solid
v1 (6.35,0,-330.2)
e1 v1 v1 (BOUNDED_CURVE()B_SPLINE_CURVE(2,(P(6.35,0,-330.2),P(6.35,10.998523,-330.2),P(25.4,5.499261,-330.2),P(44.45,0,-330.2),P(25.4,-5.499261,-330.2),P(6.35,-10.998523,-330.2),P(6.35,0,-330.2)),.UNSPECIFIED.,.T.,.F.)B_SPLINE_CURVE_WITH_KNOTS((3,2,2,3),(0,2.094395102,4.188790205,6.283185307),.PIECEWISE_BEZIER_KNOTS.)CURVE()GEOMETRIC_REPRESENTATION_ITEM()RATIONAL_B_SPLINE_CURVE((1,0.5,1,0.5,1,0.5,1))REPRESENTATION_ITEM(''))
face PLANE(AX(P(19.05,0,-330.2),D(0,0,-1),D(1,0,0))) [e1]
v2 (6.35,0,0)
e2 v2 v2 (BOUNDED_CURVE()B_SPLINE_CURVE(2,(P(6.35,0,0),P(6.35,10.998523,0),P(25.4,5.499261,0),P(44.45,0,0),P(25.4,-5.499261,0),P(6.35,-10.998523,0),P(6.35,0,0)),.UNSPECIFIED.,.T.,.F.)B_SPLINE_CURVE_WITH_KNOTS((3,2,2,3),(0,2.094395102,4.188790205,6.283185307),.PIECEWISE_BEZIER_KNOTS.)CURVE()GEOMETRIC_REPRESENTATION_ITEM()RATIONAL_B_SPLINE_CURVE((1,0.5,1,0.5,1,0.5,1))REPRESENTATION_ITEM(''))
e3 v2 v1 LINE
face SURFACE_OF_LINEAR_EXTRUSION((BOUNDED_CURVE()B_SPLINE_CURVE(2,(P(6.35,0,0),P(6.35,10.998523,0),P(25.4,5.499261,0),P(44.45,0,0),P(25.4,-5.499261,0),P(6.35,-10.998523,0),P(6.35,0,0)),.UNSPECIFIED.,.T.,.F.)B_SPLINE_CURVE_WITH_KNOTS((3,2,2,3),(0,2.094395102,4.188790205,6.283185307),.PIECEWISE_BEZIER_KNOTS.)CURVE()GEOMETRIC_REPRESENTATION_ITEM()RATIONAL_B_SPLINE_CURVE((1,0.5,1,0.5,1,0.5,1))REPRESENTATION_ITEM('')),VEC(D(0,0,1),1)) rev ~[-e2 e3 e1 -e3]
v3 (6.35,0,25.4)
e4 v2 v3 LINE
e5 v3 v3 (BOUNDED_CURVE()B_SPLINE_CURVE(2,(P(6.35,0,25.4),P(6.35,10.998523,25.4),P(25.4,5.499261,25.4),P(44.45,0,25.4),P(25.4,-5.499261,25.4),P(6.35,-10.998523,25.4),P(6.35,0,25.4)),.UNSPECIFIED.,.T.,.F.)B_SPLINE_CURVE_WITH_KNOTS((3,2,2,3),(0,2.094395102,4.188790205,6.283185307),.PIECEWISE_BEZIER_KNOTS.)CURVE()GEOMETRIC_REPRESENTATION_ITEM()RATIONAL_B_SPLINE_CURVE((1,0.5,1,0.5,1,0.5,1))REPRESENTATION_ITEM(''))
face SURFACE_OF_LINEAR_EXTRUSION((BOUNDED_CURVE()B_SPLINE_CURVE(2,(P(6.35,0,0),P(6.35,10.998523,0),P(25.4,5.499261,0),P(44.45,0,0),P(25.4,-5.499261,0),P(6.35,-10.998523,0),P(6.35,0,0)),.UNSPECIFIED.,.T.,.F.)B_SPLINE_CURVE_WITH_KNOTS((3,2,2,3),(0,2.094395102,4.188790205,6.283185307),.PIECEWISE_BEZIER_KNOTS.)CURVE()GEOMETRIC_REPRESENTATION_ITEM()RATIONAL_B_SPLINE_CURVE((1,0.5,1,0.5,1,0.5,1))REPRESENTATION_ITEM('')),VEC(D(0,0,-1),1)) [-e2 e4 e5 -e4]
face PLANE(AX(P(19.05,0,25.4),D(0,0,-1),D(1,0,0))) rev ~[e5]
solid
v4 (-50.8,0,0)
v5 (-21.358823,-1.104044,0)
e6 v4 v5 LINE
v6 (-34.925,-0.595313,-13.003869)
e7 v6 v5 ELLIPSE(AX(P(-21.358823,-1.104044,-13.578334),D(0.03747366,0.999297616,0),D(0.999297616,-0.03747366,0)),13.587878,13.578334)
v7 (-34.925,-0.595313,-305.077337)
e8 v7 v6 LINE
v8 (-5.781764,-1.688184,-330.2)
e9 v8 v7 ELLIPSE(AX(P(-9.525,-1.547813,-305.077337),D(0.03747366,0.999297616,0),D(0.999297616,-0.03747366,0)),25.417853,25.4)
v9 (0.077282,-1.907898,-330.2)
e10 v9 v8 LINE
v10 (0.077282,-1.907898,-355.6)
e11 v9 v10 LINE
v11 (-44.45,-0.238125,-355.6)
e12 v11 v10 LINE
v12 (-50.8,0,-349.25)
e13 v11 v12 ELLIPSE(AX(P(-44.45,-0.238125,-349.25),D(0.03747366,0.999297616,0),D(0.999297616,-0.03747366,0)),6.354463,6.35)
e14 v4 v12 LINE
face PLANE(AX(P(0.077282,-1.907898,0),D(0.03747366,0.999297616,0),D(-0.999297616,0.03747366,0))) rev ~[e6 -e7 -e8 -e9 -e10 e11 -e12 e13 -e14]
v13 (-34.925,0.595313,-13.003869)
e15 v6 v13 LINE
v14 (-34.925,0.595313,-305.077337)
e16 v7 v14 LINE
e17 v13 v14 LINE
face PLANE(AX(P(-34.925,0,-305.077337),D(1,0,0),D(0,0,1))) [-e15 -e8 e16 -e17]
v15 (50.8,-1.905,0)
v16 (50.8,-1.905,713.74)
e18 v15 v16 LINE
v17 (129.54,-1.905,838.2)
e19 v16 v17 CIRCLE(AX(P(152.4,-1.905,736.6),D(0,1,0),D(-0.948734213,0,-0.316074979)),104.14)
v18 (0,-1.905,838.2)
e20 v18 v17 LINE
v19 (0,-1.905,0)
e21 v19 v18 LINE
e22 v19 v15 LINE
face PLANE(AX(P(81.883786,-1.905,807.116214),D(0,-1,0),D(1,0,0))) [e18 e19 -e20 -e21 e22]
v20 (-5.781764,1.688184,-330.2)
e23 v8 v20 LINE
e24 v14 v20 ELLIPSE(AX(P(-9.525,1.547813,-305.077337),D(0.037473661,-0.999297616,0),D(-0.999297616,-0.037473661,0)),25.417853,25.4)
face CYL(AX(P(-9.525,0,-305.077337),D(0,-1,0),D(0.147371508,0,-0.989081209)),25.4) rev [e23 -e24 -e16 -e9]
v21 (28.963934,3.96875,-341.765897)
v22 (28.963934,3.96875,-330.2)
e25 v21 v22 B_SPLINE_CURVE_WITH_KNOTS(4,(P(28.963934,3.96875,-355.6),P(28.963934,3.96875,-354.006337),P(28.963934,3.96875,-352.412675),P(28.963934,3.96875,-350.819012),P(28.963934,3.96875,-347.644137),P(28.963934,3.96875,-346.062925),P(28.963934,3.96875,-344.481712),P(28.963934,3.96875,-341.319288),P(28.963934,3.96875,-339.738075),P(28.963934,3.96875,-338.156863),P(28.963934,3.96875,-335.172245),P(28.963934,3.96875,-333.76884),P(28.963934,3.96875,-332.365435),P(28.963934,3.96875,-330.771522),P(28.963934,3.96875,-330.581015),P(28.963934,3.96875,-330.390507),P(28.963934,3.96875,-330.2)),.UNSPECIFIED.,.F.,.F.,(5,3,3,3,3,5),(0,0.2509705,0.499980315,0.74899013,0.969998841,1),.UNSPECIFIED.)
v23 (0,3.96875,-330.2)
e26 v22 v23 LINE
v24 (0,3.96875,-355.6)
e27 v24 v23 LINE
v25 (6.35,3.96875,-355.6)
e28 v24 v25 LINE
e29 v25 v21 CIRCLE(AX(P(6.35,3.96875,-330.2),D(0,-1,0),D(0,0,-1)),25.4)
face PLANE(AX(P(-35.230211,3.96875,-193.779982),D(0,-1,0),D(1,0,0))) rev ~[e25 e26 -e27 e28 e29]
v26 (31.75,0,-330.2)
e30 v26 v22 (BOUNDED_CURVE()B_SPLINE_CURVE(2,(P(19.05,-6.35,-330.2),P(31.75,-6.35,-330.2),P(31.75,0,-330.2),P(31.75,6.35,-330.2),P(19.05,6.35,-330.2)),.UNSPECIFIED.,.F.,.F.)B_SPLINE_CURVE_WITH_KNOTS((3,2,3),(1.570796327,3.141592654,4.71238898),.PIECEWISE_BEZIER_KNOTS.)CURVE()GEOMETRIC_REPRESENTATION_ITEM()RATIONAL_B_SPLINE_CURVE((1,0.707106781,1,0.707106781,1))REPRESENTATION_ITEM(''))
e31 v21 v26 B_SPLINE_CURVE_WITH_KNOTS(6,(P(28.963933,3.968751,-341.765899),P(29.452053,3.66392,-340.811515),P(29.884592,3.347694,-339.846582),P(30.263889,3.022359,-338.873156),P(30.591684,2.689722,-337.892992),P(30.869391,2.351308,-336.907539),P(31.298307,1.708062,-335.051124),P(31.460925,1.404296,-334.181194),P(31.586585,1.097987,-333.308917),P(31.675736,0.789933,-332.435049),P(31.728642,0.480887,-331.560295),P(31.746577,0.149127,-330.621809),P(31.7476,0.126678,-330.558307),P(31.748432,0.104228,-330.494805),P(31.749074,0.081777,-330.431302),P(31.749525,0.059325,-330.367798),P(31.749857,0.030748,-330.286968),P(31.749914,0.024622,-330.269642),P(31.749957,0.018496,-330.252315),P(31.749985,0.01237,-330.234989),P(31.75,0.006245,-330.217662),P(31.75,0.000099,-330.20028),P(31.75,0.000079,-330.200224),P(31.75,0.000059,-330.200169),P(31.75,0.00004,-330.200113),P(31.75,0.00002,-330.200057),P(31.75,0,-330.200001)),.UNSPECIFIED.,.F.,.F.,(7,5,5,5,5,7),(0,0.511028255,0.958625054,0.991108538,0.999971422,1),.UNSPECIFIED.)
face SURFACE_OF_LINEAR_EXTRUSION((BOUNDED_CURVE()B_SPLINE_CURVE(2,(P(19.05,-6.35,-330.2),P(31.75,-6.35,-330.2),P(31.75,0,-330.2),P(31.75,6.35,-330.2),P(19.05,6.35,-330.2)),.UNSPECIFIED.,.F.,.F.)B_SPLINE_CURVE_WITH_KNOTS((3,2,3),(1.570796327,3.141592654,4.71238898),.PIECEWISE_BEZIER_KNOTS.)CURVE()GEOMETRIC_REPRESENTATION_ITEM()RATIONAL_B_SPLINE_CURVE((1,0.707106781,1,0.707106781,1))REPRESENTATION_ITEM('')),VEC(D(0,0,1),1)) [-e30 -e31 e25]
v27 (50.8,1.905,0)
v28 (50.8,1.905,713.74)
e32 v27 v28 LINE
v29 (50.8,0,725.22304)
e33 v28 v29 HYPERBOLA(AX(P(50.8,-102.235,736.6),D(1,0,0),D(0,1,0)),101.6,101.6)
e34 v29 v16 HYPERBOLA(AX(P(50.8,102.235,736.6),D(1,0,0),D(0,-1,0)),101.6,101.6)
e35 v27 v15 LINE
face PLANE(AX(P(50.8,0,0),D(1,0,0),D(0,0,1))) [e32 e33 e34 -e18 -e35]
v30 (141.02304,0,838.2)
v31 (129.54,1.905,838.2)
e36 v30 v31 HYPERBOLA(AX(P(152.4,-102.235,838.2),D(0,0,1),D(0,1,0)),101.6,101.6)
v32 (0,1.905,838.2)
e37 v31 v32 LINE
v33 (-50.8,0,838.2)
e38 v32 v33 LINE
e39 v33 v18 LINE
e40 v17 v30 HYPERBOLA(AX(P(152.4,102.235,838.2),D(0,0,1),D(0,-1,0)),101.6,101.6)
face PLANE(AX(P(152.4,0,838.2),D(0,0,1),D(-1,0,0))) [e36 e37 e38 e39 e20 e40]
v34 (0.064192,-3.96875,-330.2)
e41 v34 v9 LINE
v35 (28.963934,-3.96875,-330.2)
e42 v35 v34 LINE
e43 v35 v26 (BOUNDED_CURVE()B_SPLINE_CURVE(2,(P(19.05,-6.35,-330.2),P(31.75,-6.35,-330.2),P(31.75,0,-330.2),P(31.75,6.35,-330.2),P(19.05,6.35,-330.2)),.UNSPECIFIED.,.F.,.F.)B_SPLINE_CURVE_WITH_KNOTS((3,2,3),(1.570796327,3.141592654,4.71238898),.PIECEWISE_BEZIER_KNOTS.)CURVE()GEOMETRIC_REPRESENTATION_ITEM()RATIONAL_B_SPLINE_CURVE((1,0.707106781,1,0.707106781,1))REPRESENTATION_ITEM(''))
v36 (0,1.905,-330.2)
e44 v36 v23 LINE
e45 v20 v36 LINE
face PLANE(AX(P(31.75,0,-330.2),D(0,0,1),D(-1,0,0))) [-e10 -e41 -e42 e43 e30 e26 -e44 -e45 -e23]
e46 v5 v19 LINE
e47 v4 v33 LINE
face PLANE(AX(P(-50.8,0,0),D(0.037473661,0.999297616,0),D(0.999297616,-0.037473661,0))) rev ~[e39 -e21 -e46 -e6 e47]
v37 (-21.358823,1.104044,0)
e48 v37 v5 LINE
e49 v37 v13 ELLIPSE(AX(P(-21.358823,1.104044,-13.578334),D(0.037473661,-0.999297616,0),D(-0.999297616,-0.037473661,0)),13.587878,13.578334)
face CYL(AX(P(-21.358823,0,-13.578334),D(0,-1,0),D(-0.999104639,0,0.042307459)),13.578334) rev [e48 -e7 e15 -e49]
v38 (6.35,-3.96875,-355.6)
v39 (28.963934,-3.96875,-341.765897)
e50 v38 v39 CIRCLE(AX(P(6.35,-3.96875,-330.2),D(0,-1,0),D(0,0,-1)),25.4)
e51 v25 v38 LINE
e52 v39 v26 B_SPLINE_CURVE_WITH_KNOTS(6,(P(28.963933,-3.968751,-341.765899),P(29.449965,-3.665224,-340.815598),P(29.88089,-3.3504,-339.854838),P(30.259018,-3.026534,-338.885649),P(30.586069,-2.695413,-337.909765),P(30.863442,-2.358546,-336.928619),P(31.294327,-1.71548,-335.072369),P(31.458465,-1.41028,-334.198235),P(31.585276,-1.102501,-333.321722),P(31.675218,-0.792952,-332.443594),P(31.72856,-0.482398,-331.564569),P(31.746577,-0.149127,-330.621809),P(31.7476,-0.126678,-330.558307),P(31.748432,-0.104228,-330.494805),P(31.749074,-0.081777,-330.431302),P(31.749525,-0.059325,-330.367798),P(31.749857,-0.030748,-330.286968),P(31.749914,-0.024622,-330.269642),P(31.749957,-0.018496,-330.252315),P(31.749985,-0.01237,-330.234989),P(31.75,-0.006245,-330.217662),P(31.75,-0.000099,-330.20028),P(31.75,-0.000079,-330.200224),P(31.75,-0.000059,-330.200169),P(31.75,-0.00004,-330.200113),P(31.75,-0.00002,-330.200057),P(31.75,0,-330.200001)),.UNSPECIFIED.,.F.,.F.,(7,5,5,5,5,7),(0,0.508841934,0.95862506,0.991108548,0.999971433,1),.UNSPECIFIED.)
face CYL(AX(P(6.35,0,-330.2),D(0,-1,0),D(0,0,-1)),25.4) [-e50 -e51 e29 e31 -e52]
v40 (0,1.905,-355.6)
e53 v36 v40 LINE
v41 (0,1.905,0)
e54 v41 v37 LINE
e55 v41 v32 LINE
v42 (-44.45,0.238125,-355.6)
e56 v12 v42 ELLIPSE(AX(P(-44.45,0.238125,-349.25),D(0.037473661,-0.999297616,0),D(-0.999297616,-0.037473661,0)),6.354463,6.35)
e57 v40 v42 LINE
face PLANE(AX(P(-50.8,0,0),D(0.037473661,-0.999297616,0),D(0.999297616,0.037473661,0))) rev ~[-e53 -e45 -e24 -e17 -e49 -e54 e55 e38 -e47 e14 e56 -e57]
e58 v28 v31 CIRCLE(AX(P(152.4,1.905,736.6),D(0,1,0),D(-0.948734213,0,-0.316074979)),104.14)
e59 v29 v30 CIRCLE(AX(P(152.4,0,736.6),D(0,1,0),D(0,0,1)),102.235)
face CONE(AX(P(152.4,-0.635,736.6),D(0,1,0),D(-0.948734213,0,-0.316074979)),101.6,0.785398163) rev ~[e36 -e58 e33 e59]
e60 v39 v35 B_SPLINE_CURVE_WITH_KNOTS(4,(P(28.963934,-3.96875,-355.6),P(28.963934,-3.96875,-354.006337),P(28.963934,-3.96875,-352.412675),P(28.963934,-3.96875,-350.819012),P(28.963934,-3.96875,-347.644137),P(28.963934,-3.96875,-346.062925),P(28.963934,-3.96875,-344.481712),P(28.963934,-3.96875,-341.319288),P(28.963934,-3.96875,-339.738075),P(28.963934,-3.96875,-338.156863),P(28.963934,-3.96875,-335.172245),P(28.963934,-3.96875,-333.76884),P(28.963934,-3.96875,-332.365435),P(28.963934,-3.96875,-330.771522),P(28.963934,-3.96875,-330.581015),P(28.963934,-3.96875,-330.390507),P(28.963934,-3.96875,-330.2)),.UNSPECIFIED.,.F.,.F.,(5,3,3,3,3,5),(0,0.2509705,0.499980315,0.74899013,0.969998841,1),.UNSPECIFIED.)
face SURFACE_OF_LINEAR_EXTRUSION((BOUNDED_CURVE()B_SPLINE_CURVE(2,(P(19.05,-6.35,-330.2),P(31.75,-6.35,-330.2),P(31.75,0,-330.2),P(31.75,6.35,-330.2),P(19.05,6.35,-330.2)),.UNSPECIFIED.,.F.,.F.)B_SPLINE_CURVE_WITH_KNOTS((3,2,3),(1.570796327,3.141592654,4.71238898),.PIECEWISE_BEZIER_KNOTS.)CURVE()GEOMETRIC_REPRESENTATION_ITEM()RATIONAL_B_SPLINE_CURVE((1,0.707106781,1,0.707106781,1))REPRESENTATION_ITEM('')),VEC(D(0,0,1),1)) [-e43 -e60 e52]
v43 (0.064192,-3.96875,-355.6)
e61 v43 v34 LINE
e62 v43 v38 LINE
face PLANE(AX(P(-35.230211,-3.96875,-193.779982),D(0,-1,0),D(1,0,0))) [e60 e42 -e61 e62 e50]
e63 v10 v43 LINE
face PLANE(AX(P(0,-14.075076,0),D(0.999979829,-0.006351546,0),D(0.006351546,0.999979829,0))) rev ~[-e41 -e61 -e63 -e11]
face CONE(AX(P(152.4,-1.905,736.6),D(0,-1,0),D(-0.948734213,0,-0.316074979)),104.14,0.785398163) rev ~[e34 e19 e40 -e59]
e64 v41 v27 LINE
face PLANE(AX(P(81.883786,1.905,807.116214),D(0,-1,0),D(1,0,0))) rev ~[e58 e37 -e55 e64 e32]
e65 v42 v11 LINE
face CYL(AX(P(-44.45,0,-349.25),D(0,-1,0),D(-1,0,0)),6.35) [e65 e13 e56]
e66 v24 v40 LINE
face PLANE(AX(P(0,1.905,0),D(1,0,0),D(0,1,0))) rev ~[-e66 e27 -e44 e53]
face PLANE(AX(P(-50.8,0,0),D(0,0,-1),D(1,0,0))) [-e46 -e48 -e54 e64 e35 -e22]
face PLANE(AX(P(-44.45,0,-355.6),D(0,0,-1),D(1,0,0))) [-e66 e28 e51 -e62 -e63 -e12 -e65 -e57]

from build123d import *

# Parameters (mm, degrees)
F0_W          = 101.6
F0_H          = 838.2
F1_DEPTH      = 1.905
F3_DEPTH      = 330.2
F3_DEPTH_BACK = 25.4
F5_DEPTH      = 838.201
F7_DEPTH      = 1.905
F9_DEPTH      = 3.96875
F11_DEPTH     = 355.6010001
F13_DEPTH     = 25.401
F14_T2_ANGLE  = 126.8514429449
F14_T4_ANGLE  = 126.8514429449


# Not quite as in the source:
# - a fillet or chamfer that OpenCascade refuses, or shapes differently, is made with other operations: its cross-section is extruded or revolved along the edge and cut away or added


with BuildPart() as f1:
    # F0 (on Front) → F1 (new body, symmetric)
    with BuildSketch(Plane.XZ):
        with Locations((0, 419.1)):
            Rectangle(F0_W, F0_H)
    extrude(amount=F1_DEPTH, both=True)

    # F4 (on face) → F5 (cut, through all)
    with BuildSketch(Plane(origin=(0, 0, 0), x_dir=(1, 0, 0), z_dir=(0, 0, -1))):
        Polygon((-50.8, 0), (0, 1.905), (0, 25.9346883851), (-64.6571069956, 25.9346883851), (-64.6571069956, -15.2188915652), (0, -15.2188915652), (0, -1.905), align=None)
    extrude(amount=-F5_DEPTH, mode=Mode.SUBTRACT)

    # F6 (on Front) → F7 (join, symmetric)
    with BuildSketch(Plane.XZ):
        with BuildLine():
            Line((152.4, 838.2), (50.8, 838.2))
            Line((50.8, 838.2), (50.8, 736.6))
            ThreePointArc((50.8, 736.6), (80.5579510314, 808.4420489686), (152.4, 838.2))
        make_face()
    extrude(amount=F7_DEPTH, both=True)

    # F8 (on Front) → F9 (join, symmetric)
    with BuildSketch(Plane.XZ):
        with BuildLine():
            ThreePointArc((-34.925, -13.0038693017), (-30.7548566659, -3.7760019307), (-21.3588234037, 0))
            add(Edge.make_bspline(
                [(-21.3588234037, 0), (-25.8808822691, 0), (-30.4029411346, 0), (-34.925, 0)],
                knots=[0.420449279, 0.420449279, 0.420449279, 0.420449279, 0.687499999, 0.687499999, 0.687499999, 0.687499999], degree=3))
            add(Edge.make_bspline(
                [(-34.925, 0), (-40.2166666902, 0), (-45.5083333804, 0), (-50.8000000706, 0)],
                knots=[0.687499999, 0.687499999, 0.687499999, 0.687499999, 1, 1, 1, 1], degree=3))
            Line((-50.8000000706, 0), (-50.8000000706, -349.25))
            ThreePointArc((-50.8000000706, -349.25), (-48.9401281311, -353.7401280605), (-44.4500000706, -355.6))
            Line((-44.4500000706, -355.6), (6.35, -355.6))
            ThreePointArc((6.35, -355.6), (24.3105122421, -348.1605122421), (31.75, -330.2))
            Line((31.75, -330.2), (-5.7817636978, -330.2))
            ThreePointArc((-5.7817636978, -330.2), (-26.109357056, -324.3158169798), (-34.925, -305.0773372831))
            Line((-34.925, -305.0773372831), (-34.925, -13.0038693017))
        make_face()
    extrude(amount=F9_DEPTH, both=True)

    # F10 (on face) → F11 (cut, through all)
    with BuildSketch(Plane.XY):
        Polygon((-50.8000000706, -2.6e-09), (0, 1.905), (0, 13.2531421259), (-59.9712096155, 13.2531421259), (-59.9712096155, -14.0750762075), (0, -14.0750762075), (0.0772819473, -1.907898073), align=None)
    extrude(amount=-F11_DEPTH, mode=Mode.SUBTRACT)

    # F12 (on face) → F13 (cut, through all)
    with BuildSketch(Plane.XY.offset(-330.2)):
        with BuildLine():
            add(Edge.make_bspline(
                [(19.05, -6.35), (31.75, -6.35), (31.75, 0), (31.75, 6.35), (19.05, 6.35)],
                knots=[1.5707963268, 1.5707963268, 1.5707963268, 3.1415926536, 3.1415926536, 4.7123889804, 4.7123889804, 4.7123889804], degree=2, weights=[1, 0.7071067812, 1, 0.7071067812, 1]))
            Line((19.05, -6.35), (19.05, -9.2232320458))
            Line((19.05, -9.2232320458), (36.4893190563, -9.2232320458))
            Line((36.4893190563, -9.2232320458), (36.4893190563, 9.4516491517))
            Line((36.4893190563, 9.4516491517), (19.05, 9.4516491517))
            Line((19.05, 9.4516491517), (19.05, 6.35))
        make_face()
    extrude(amount=-F13_DEPTH, mode=Mode.SUBTRACT)

    # F14: chamfer of 2.54 on 2 edges, made by hand

    # F14_s1 → F14_t2 (revolve, cut)
    with BuildSketch(Plane(origin=(-205.6598094156, 0, 617.3107986337), x_dir=(0, 1, 0), z_dir=(0.3160749787, 0, -0.9487342135))):
        Polygon((-1.905, 273.267923448), (0.635, 275.807923448), (-1.905, 275.807923448), align=None)
    revolve(axis=Axis((152.4, -1.905, 736.6), (0, 1, 0)), revolution_arc=F14_T2_ANGLE, mode=Mode.SUBTRACT)

    # F14_s3 → F14_t4 (revolve, cut)
    with BuildSketch(Plane(origin=(-205.6598094156, 0, 617.3107986337), x_dir=(0, 1, 0), z_dir=(0.3160749787, 0, -0.9487342135))):
        Polygon((-0.635, 275.807923448), (1.905, 273.267923448), (1.905, 275.807923448), align=None)
    revolve(axis=Axis((152.4, 1.905, 736.6), (0, 1, 0)), revolution_arc=F14_T4_ANGLE, mode=Mode.SUBTRACT)


with BuildPart() as f3:
    # F2 (on face) → F3 (new body, two sides)
    with BuildSketch(Plane(origin=(0, 0, 0), x_dir=(1, 0, 0), z_dir=(0, 0, -1))) as f3_sk:
        with BuildLine():
            add(Edge.make_bspline(
                [(6.35, 0), (6.35, -10.9985226281), (25.4, -5.499261314), (44.45, 0), (25.4, 5.499261314), (6.35, 10.9985226281), (6.35, 0)],
                knots=[0, 0, 0, 2.0943951024, 2.0943951024, 4.1887902048, 4.1887902048, 6.2831853072, 6.2831853072, 6.2831853072], degree=2, weights=[1, 0.5, 1, 0.5, 1, 0.5, 1]))
        make_face()
    extrude(amount=F3_DEPTH)
    extrude(f3_sk.sketch, amount=-F3_DEPTH_BACK)


solid = Compound([f1.part, f3.part])
